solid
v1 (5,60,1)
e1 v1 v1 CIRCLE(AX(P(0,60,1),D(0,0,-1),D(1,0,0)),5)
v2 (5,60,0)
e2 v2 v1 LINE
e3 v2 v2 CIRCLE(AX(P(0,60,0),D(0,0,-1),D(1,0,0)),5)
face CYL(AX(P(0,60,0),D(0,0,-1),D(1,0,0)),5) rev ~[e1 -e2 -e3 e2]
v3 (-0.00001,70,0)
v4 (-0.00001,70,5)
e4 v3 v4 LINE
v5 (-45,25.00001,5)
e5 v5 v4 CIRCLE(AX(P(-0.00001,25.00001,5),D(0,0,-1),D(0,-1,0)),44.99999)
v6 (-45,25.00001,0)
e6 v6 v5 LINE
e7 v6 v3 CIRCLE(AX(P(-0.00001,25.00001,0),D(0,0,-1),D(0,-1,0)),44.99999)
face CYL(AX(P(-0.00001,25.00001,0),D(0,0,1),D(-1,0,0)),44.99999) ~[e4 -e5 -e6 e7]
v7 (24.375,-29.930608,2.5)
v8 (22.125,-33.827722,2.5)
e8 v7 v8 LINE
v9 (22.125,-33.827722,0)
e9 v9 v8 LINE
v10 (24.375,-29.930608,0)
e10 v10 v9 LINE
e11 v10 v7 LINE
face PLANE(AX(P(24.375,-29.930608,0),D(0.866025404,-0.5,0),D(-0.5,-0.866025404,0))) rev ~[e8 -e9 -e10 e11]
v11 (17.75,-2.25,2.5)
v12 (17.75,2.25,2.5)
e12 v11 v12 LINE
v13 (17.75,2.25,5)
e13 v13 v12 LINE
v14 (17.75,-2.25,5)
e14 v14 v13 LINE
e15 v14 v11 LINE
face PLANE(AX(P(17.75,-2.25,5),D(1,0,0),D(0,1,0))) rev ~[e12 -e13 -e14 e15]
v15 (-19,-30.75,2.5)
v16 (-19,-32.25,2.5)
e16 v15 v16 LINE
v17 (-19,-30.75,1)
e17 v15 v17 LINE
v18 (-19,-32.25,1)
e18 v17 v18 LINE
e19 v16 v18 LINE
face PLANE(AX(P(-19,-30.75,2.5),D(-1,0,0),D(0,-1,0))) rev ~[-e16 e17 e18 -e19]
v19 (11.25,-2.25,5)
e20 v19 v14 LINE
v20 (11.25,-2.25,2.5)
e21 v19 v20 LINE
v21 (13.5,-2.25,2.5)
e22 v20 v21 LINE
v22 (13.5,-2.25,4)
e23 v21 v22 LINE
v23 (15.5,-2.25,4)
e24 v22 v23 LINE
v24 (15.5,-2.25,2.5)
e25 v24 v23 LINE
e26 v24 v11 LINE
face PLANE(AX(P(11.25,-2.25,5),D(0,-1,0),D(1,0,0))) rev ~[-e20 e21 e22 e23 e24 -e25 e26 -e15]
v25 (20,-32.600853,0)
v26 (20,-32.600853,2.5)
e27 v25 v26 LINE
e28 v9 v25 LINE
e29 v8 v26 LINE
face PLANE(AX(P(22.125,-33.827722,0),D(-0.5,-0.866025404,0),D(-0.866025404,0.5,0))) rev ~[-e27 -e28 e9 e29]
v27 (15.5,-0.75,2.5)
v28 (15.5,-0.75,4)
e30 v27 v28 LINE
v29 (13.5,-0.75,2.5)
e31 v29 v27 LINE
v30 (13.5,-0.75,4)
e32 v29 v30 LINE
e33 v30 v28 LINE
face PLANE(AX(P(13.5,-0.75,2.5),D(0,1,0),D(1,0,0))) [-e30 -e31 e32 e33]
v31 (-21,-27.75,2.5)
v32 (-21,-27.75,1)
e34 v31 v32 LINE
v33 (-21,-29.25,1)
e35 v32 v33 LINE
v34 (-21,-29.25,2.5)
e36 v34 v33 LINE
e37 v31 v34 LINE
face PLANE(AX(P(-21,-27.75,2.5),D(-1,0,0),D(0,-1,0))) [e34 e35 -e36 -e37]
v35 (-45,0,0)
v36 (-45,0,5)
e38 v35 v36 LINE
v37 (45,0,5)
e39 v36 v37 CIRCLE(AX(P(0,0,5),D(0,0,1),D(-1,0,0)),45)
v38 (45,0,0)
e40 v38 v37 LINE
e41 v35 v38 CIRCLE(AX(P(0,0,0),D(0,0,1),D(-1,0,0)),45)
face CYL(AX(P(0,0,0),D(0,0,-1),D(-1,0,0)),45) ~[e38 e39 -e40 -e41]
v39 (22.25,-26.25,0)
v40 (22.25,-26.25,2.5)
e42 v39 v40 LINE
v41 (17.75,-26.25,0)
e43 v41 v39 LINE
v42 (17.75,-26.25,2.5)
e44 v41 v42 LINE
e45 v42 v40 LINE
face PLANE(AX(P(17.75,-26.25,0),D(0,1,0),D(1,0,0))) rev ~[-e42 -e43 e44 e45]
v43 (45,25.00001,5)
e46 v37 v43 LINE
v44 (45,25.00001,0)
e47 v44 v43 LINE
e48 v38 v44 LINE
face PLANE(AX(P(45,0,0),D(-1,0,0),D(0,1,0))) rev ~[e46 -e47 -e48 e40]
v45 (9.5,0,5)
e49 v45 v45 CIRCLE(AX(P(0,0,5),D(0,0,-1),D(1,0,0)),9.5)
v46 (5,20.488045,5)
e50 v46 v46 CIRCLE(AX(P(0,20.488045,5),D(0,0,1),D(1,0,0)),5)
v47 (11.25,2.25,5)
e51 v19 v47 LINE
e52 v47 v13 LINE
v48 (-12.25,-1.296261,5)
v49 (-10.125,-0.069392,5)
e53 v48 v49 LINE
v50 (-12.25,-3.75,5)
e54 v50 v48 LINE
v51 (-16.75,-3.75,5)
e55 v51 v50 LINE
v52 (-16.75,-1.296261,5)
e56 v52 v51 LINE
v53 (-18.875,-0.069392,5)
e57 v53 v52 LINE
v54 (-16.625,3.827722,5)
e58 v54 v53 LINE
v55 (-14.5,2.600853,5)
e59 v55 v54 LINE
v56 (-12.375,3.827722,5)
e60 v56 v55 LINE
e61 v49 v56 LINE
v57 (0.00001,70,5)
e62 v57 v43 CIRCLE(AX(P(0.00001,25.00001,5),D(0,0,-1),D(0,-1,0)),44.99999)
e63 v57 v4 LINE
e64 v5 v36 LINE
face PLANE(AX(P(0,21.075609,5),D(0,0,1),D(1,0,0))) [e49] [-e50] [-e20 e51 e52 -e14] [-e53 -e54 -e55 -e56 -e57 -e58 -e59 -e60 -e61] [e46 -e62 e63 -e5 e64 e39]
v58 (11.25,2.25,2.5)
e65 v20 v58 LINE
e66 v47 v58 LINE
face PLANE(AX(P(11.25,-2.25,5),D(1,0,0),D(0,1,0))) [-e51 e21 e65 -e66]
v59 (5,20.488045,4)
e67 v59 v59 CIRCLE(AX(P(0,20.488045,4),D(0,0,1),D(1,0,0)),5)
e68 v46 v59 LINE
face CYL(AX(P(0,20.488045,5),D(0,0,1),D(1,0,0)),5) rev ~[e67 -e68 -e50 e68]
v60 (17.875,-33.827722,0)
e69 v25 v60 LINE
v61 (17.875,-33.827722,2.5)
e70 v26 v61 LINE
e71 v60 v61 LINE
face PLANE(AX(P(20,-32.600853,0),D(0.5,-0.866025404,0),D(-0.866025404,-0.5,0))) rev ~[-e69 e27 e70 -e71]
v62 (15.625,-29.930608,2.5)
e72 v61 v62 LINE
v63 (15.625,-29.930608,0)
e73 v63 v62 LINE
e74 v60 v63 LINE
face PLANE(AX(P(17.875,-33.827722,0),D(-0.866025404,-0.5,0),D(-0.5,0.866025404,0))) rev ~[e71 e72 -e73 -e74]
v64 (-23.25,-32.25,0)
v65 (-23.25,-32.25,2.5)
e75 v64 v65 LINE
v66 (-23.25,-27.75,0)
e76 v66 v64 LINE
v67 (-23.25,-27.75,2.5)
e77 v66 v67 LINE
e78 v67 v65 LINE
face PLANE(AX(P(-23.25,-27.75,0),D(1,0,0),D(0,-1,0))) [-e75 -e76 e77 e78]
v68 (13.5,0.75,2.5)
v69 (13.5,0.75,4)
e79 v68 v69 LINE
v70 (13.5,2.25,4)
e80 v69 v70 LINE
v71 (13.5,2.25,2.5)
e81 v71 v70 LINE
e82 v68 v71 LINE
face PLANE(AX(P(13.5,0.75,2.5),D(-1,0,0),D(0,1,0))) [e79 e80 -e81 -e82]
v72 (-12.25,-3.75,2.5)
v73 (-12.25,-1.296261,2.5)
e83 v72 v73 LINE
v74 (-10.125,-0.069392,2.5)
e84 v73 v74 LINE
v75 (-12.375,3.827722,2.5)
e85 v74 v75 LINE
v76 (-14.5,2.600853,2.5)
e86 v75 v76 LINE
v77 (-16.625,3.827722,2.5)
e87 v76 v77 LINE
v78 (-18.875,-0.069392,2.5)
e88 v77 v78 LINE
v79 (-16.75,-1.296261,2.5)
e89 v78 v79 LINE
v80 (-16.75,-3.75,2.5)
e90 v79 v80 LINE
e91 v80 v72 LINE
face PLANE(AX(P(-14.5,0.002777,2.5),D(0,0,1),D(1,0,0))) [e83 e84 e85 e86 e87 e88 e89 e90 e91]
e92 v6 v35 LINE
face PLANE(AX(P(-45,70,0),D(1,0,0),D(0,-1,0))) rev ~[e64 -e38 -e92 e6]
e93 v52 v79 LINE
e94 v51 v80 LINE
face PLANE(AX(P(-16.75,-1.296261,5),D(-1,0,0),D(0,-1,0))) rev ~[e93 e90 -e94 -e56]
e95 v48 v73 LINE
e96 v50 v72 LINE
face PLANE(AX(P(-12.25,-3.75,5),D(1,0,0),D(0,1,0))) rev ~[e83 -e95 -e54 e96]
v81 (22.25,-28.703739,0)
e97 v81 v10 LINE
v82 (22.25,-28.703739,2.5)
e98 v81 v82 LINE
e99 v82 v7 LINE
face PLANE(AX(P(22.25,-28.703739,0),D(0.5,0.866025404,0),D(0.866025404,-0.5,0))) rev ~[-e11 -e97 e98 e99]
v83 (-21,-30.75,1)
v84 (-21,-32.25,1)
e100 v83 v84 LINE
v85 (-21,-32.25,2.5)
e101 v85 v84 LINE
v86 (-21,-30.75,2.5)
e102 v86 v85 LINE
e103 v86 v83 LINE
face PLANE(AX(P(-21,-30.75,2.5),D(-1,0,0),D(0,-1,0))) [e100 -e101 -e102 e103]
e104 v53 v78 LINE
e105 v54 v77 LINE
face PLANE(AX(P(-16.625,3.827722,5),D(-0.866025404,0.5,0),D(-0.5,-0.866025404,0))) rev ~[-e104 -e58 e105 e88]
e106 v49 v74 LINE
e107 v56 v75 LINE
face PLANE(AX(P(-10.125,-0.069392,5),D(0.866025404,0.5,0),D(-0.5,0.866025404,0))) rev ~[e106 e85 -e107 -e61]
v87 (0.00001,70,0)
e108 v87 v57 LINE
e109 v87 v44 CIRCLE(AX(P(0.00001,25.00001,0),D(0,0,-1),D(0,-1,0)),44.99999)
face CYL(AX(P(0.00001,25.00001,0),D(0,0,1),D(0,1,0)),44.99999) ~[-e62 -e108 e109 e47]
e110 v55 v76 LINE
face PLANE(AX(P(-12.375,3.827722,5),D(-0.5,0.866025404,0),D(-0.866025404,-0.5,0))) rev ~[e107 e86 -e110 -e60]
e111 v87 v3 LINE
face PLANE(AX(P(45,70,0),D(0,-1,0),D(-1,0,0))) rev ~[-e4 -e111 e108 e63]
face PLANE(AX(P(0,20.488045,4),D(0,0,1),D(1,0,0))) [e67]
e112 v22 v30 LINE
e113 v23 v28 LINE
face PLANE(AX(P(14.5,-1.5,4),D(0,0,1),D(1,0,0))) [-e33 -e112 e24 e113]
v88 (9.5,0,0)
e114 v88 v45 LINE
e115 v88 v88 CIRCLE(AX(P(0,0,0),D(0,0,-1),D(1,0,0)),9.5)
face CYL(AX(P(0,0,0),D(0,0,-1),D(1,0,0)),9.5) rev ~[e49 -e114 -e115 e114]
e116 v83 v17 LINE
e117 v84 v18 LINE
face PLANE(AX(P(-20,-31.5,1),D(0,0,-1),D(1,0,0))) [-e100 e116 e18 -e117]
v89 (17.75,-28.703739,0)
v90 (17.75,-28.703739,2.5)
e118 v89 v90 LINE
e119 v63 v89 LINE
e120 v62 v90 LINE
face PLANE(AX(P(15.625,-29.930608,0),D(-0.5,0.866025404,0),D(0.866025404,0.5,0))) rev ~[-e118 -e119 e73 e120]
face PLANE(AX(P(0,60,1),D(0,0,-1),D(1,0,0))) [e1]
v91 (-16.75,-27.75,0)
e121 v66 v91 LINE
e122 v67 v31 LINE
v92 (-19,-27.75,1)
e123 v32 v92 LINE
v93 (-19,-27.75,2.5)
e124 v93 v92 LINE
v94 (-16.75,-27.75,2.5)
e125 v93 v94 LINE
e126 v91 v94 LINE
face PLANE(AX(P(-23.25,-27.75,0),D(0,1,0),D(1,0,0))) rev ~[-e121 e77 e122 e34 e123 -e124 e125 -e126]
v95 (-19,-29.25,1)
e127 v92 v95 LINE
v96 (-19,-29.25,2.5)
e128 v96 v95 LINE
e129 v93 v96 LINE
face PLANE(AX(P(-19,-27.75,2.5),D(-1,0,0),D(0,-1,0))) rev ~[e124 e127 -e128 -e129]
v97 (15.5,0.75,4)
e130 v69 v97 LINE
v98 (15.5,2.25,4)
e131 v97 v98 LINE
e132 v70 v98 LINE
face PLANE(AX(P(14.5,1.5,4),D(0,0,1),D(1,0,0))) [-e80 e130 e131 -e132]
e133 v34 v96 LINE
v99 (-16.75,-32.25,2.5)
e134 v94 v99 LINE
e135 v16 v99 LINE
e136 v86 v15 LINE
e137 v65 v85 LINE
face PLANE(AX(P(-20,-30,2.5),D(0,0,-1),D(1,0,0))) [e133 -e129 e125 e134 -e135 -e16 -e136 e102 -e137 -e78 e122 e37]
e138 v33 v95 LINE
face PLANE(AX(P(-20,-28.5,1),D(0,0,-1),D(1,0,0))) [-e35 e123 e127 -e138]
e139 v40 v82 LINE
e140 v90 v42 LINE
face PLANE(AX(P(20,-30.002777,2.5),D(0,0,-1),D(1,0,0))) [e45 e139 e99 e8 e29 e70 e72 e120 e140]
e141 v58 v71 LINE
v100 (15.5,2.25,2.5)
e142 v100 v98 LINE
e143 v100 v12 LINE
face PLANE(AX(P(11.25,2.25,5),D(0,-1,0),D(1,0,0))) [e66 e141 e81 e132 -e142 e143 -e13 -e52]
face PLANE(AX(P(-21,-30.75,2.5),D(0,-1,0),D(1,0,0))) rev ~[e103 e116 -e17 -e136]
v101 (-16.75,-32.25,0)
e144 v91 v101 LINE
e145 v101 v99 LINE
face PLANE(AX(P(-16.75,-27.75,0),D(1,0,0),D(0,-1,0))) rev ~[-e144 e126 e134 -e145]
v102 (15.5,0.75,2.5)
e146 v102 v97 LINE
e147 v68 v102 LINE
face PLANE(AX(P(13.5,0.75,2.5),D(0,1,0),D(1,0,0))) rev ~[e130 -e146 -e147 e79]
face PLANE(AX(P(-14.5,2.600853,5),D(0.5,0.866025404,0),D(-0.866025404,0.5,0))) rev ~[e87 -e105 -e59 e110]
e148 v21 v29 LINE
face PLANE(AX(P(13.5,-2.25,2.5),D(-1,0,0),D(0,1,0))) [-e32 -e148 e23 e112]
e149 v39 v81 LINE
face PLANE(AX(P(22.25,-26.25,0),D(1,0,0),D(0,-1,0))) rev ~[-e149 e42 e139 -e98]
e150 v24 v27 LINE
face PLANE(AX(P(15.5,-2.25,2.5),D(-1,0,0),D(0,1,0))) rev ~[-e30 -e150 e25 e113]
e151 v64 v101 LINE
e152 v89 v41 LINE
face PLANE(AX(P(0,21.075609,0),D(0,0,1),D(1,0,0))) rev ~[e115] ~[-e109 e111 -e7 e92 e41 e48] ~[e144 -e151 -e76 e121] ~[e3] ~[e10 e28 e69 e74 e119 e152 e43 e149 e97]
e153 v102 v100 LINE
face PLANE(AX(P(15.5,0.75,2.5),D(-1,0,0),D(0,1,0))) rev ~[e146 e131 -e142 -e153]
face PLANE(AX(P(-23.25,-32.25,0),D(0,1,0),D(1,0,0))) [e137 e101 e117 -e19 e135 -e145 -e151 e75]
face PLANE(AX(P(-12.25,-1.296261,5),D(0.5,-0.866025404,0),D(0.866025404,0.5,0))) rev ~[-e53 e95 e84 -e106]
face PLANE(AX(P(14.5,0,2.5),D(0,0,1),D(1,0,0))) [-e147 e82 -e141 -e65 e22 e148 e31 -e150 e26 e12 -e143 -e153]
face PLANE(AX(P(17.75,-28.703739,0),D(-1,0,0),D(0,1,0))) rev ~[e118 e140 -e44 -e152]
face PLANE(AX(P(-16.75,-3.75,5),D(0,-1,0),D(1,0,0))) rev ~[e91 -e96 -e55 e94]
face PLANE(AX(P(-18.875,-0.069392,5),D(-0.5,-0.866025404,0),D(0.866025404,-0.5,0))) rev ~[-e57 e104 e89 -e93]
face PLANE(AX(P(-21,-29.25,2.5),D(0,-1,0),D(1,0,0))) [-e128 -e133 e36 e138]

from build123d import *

# Parameters (mm, degrees)
F1_DEPTH  = 5
F3_DEPTH  = 2.5
F4_W      = 6.5
F4_H      = 4.5
F5_DEPTH  = 2.5
F6_W      = 2
F6_H      = 1.5
F7_DEPTH  = 1.5
F8_R      = 5
F9_DEPTH  = 1
F10_R     = 9.5
F11_DEPTH = 10
F14_DEPTH = 2.5
F12_R     = 5
F15_DEPTH = 1
F16_W     = 6.5
F16_H     = 4.5
F17_DEPTH = 2.5
F18_W     = 2
F18_H     = 1.5
F19_DEPTH = 1.5
F20_R     = 44.99999


# Not quite as in the source:
# - a fillet or chamfer is up to 0.001 mm smaller than in the source, because OpenCascade refuses the exact size


with BuildPart() as f1:
    # F0 (on Top) → F1 (new body)
    with BuildSketch(Plane.XY):
        with BuildLine():
            Line((-45, 70), (-45, 0))
            ThreePointArc((-45, 0), (0, -45), (45, 0))
            Line((45, 0), (45, 70))
            Line((45, 70), (-45, 70))
        make_face()
    extrude(amount=F1_DEPTH)

    # F2 (on face) → F3 (cut)
    with BuildSketch(Plane.XY.offset(5)):
        Polygon((-14.5, 2.6008529611), (-16.625, 3.8277222831), (-18.875, -0.0693920339), (-16.75, -1.2962613559), (-16.75, -3.75), (-12.25, -3.75), (-12.25, -1.2962613559), (-10.125, -0.0693920339), (-12.375, 3.8277222831), align=None)
    extrude(amount=-F3_DEPTH, mode=Mode.SUBTRACT)

    # F4 (on face) → F5 (cut)
    with BuildSketch(Plane.XY.offset(5)):
        with Locations((14.5, 0)):
            Rectangle(F4_W, F4_H)
    extrude(amount=-F5_DEPTH, mode=Mode.SUBTRACT)

    # F6 (on face) → F7 (join)
    with BuildSketch(Plane.XY.offset(2.5)):
        with Locations((14.5, 1.5)):
            Rectangle(F6_W, F6_H)
        with Locations((14.5, -1.5)):
            Rectangle(F6_W, F6_H)
    extrude(amount=F7_DEPTH)

    # F8 (on face) → F9 (cut)
    with BuildSketch(Plane.XY.offset(5)):
        with Locations((0, 20.4880452948)):
            Circle(F8_R)
    extrude(amount=-F9_DEPTH, mode=Mode.SUBTRACT)

    # F10 (on face) → F11 (cut)
    with BuildSketch(Plane(origin=(0, 0, 0), x_dir=(1, 0, 0), z_dir=(0, 0, -1))):
        Circle(F10_R)
    extrude(amount=-F11_DEPTH, mode=Mode.SUBTRACT)

    # F13 (on face) → F14 (cut)
    with BuildSketch(Plane(origin=(0, 0, 0), x_dir=(1, 0, 0), z_dir=(0, 0, -1))):
        Polygon((20, 32.6008529611), (17.875, 33.8277222831), (15.625, 29.9306079661), (17.75, 28.7037386441), (17.75, 26.25), (22.25, 26.25), (22.25, 28.7037386441), (24.375, 29.9306079661), (22.125, 33.8277222831), align=None)
    extrude(amount=-F14_DEPTH, mode=Mode.SUBTRACT)

    # F12 (on face) → F15 (cut)
    with BuildSketch(Plane(origin=(0, 0, 0), x_dir=(1, 0, 0), z_dir=(0, 0, -1))):
        with Locations((0, -60)):
            Circle(F12_R)
    extrude(amount=-F15_DEPTH, mode=Mode.SUBTRACT)

    # F16 (on face) → F17 (cut)
    with BuildSketch(Plane(origin=(0, 0, 0), x_dir=(1, 0, 0), z_dir=(0, 0, -1))):
        with Locations((-20, 30)):
            Rectangle(F16_W, F16_H)
    extrude(amount=-F17_DEPTH, mode=Mode.SUBTRACT)

    # F18 (on face) → F19 (join)
    with BuildSketch(Plane(origin=(0, 0, 2.5), x_dir=(1, 0, 0), z_dir=(0, 0, -1))):
        with Locations((-20, 31.5)):
            Rectangle(F18_W, F18_H)
        with Locations((-20, 28.5)):
            Rectangle(F18_W, F18_H)
    extrude(amount=F19_DEPTH)

    # F20 (radius 45 in the source; OpenCascade refuses exactly that, so slightly less here)
    f20_edges = [f1.edges().sort_by_distance(p)[0] for p in [
        (-45, 70, 2.5),
        (45, 70, 2.5),
    ]]
    fillet(f20_edges, radius=F20_R)


solid = f1.part
